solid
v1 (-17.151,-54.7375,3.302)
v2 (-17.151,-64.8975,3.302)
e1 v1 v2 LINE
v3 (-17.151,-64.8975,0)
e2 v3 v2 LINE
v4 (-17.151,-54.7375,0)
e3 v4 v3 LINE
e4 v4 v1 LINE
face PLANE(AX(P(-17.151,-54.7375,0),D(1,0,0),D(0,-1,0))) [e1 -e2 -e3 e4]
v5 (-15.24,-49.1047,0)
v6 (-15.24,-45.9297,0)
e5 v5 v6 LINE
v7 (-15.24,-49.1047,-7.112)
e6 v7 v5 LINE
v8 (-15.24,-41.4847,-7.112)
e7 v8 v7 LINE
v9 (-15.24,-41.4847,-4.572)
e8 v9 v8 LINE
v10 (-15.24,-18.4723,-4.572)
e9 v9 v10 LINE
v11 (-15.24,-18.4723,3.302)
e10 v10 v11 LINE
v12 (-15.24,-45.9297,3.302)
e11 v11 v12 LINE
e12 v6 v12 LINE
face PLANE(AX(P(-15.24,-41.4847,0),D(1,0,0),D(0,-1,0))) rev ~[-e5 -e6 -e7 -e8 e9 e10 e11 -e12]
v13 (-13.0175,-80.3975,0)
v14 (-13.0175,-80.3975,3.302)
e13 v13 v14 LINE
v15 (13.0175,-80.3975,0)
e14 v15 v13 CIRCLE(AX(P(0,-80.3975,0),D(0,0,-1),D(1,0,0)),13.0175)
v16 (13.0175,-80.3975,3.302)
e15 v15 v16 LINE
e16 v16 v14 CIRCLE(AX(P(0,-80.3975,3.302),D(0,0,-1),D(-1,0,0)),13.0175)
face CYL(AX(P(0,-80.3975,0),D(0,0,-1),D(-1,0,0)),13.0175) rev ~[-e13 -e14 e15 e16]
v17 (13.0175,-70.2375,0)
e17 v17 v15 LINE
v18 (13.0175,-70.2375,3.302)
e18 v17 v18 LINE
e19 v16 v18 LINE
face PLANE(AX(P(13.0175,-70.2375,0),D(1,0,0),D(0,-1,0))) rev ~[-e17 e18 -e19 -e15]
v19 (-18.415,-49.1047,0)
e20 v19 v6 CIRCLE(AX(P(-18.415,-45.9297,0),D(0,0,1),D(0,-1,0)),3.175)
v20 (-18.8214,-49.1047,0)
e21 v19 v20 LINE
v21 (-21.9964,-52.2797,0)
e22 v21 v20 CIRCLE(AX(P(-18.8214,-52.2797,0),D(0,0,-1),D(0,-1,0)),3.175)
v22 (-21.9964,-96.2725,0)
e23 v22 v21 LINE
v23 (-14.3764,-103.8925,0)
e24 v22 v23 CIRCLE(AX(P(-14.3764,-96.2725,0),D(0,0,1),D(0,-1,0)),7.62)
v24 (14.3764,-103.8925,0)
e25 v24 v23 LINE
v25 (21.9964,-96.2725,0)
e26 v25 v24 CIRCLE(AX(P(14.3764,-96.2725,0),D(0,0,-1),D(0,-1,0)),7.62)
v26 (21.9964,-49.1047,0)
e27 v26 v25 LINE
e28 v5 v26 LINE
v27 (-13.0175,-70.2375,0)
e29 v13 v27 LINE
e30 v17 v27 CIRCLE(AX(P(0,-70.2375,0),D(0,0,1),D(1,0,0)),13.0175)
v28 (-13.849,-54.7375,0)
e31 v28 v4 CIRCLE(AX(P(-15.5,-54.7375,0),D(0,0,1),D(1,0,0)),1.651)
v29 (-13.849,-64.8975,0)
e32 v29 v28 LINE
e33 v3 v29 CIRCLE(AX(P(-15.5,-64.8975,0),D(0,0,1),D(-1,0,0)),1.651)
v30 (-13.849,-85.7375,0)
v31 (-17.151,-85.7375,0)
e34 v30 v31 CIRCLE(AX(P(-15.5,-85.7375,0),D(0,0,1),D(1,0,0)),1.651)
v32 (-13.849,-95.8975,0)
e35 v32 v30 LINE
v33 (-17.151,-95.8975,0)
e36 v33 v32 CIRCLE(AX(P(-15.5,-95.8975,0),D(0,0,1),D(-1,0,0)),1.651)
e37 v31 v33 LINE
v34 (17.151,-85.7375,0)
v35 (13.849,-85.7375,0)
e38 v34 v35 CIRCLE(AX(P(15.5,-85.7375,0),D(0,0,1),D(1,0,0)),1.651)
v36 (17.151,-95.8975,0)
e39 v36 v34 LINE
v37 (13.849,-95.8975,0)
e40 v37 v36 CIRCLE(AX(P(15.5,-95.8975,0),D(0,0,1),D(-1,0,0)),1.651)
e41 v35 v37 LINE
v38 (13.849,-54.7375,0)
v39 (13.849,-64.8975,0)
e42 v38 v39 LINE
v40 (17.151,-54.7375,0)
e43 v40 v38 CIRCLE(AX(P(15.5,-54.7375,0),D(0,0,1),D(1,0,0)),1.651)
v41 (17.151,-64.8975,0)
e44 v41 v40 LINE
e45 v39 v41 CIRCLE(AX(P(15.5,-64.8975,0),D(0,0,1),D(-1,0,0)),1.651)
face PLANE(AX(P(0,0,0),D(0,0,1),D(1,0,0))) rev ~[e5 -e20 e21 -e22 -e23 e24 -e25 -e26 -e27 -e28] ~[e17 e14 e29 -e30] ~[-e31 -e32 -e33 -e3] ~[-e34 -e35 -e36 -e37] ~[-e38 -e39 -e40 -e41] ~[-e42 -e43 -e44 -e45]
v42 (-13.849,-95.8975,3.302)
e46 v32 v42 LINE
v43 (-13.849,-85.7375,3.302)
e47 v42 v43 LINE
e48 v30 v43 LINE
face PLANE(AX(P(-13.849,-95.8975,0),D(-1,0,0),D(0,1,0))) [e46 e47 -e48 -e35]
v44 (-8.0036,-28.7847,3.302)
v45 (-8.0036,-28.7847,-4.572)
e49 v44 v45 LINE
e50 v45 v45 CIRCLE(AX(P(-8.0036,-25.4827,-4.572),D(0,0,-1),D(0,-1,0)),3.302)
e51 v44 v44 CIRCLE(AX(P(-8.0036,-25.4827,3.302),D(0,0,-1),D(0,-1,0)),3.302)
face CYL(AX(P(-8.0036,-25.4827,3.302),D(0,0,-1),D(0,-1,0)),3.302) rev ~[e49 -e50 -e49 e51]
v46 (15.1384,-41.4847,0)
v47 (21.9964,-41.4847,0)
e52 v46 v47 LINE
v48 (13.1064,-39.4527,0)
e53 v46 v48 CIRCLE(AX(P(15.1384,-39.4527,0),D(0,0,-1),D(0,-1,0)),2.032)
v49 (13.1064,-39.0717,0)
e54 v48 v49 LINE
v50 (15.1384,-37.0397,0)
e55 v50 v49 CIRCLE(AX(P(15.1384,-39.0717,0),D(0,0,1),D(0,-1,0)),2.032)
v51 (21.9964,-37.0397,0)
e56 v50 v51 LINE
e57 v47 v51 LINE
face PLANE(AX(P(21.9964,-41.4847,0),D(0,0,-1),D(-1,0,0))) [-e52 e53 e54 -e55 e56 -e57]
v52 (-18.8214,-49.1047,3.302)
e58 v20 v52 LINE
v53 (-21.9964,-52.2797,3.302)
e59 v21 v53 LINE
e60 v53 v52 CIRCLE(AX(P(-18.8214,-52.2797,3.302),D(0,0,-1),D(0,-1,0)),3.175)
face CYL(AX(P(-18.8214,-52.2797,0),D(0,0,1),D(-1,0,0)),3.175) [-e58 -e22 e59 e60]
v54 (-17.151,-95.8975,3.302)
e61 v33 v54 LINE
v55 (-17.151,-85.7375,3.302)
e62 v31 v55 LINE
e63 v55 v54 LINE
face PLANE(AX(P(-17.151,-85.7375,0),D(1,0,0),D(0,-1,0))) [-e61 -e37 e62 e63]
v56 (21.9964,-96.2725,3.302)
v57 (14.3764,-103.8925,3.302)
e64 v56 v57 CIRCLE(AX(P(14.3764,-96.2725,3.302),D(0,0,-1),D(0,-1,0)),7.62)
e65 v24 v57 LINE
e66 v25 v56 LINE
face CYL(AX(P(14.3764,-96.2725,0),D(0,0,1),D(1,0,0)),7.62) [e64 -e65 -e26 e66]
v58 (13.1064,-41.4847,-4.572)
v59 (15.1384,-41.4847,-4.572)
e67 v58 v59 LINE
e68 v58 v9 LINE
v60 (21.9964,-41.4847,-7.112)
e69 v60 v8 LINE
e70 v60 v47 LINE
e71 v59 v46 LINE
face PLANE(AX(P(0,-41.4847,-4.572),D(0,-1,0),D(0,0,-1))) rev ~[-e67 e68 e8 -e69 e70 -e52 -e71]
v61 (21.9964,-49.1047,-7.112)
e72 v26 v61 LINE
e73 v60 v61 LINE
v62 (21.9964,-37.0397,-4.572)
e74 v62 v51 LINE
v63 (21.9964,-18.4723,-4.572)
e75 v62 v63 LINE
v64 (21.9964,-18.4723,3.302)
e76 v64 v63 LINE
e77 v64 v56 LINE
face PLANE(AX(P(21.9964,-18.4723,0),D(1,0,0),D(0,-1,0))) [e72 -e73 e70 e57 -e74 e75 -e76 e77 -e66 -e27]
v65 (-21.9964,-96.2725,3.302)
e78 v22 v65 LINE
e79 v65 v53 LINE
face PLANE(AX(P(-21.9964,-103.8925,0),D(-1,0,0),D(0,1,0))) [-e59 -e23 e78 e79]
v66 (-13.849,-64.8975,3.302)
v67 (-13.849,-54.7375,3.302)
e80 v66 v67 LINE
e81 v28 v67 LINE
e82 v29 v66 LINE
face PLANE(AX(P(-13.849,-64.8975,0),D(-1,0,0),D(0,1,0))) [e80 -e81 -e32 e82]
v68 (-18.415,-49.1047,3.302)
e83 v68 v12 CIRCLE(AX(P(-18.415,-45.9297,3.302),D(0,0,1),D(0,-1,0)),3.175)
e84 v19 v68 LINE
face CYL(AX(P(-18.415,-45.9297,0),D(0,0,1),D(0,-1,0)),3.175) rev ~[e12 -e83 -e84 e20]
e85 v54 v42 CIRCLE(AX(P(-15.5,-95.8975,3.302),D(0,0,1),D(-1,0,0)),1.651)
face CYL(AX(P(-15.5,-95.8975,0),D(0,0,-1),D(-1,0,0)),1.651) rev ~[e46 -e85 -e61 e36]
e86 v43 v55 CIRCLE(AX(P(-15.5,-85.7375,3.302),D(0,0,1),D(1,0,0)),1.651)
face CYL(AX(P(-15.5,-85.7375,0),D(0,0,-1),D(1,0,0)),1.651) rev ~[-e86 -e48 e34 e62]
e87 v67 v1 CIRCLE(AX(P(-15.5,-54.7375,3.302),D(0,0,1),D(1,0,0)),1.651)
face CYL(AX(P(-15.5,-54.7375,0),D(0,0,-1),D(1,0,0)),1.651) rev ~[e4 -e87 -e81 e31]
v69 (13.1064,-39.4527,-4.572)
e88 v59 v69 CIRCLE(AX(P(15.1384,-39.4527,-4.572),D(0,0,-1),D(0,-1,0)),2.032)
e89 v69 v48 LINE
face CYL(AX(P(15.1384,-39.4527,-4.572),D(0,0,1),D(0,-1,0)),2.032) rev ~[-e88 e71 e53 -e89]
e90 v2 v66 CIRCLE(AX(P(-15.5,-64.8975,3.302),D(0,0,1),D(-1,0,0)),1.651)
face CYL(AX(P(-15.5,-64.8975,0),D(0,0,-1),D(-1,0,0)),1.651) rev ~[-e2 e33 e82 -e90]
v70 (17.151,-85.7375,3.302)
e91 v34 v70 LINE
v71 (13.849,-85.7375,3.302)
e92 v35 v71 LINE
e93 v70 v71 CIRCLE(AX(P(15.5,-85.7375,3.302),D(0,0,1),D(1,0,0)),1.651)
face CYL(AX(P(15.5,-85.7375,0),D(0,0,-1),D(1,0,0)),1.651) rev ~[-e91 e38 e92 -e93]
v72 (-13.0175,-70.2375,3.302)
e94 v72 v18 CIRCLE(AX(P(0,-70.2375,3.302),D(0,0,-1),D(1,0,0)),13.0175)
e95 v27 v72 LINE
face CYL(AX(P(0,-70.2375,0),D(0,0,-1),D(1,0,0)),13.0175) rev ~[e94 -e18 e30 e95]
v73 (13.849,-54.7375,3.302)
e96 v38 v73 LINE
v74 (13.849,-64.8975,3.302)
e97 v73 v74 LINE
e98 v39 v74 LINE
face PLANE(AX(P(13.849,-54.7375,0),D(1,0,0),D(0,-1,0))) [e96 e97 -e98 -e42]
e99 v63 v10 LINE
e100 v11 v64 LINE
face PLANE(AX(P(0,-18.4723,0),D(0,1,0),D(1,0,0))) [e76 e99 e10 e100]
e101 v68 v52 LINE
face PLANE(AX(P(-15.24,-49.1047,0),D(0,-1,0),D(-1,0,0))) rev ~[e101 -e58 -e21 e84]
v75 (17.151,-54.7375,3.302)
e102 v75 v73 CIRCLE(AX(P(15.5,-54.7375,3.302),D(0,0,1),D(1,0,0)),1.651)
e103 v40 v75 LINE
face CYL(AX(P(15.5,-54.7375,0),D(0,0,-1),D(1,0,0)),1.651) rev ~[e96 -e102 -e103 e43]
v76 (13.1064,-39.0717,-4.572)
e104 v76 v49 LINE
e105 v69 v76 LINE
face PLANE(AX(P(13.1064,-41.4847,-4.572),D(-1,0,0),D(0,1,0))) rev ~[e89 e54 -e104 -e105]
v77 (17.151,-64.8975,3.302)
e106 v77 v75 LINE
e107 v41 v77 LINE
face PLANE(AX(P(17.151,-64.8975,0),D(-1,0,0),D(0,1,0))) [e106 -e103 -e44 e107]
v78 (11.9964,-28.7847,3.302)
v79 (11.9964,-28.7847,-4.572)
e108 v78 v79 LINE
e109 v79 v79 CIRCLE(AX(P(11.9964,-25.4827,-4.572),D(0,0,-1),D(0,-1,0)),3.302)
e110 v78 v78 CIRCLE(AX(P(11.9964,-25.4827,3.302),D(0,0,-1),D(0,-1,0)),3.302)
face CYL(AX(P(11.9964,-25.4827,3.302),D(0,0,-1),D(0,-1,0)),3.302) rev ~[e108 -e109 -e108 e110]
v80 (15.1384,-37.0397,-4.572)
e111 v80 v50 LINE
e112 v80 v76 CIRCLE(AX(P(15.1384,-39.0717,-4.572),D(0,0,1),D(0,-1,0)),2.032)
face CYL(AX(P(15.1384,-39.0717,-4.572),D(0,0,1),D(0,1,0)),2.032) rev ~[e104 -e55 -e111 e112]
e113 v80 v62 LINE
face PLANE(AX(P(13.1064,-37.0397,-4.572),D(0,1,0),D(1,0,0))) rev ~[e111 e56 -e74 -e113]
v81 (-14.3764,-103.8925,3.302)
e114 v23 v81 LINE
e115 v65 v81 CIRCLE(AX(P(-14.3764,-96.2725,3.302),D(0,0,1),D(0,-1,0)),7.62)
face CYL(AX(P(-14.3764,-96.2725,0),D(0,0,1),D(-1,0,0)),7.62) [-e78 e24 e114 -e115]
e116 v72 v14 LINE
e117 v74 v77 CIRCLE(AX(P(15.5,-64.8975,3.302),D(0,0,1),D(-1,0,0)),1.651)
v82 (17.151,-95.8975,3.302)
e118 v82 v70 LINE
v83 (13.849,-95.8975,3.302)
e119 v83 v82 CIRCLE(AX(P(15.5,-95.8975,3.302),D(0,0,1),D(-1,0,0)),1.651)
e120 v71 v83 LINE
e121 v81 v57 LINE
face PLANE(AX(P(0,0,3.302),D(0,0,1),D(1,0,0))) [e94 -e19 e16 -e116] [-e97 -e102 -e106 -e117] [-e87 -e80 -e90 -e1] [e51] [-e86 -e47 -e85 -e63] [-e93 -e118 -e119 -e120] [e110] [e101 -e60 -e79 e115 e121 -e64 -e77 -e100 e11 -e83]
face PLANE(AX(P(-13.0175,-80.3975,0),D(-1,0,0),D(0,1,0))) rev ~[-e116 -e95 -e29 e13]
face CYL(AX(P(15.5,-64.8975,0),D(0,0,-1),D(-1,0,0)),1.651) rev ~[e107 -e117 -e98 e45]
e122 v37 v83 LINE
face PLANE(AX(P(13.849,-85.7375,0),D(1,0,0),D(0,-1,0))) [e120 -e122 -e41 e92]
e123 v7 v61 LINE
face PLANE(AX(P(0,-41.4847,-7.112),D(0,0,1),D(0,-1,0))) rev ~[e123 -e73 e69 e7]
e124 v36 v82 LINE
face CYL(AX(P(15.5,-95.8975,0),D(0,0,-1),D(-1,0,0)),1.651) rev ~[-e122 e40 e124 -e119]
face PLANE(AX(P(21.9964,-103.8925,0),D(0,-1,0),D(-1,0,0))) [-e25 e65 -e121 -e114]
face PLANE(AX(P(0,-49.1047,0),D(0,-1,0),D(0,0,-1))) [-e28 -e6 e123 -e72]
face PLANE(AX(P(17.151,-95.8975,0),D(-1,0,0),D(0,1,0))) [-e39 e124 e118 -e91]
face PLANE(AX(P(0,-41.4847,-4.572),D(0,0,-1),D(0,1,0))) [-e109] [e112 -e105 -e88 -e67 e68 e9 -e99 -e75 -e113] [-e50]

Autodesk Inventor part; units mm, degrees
ref_plane "YZ Plane" through (0, 0, 0) normal (1, 0, 0) x (0, 1, 0)
ref_plane "XZ Plane" through (0, 0, 0) normal (0, 1, 0) x (-1, 0, 0)
sketch "Sketch1" plane through (0, 0, 0) normal (0, 0, 1) x (1, 0, 0)
  line L0 (0, 128.9005) -> (0, -151.1555) projected
  line L1 (-57.1993, 0) -> (35.1957, 0) projected
  line L2 (21.9964, -103.8925) -> (-21.9964, -103.8925)
  line L3 (-21.9964, -103.8925) -> (-21.9964, -18.4723)
  line L4 (-21.9964, -18.4723) -> (21.9964, -18.4723)
  line L5 (21.9964, -18.4723) -> (21.9964, -103.8925)
  line L6 (21.9964, -103.8925) -> (-21.9964, -18.4723) construction
  line L7 (-21.9964, -103.8925) -> (21.9964, -18.4723) construction
  line L8 (15.5, -90.8175) -> (-15.5, -90.8175) construction
  line L9 (-15.5, -90.8175) -> (-15.5, -59.8175) construction
  line L10 (-15.5, -59.8175) -> (15.5, -59.8175) construction
  line L11 (15.5, -59.8175) -> (15.5, -90.8175) construction
  line L12 (15.5, -90.8175) -> (-15.5, -59.8175) construction
  line L13 (-15.5, -90.8175) -> (15.5, -59.8175) construction
  line L14 (0, -111.1475) -> (0, -39.4875) construction
  line L15 (-15.5, -64.8975) -> (-15.5, -54.7375) construction
  line L16 (-13.849, -64.8975) -> (-13.849, -54.7375)
  line L17 (-17.151, -54.7375) -> (-17.151, -64.8975)
  arc A0 (-17.151, -64.8975) -> (-13.849, -64.8975) centre (-15.5, -64.8975) ccw
  arc A1 (-13.849, -54.7375) -> (-17.151, -54.7375) centre (-15.5, -54.7375) ccw
  arc A2 (17.151, -54.7375) -> (13.849, -54.7375) centre (15.5, -54.7375) ccw
  line L18 (17.151, -64.8975) -> (17.151, -54.7375)
  line L19 (15.5, -64.8975) -> (15.5, -54.7375) construction
  line L20 (13.849, -54.7375) -> (13.849, -64.8975)
  arc A3 (13.849, -64.8975) -> (17.151, -64.8975) centre (15.5, -64.8975) ccw
  arc A4 (-13.849, -85.7375) -> (-17.151, -85.7375) centre (-15.5, -85.7375) ccw
  line L21 (-13.849, -95.8975) -> (-13.849, -85.7375)
  line L22 (-15.5, -95.8975) -> (-15.5, -85.7375) construction
  line L23 (-17.151, -85.7375) -> (-17.151, -95.8975)
  arc A5 (-17.151, -95.8975) -> (-13.849, -95.8975) centre (-15.5, -95.8975) ccw
  arc A6 (17.151, -85.7375) -> (13.849, -85.7375) centre (15.5, -85.7375) ccw
  line L24 (17.151, -95.8975) -> (17.151, -85.7375)
  line L25 (15.5, -95.8975) -> (15.5, -85.7375) construction
  line L26 (13.849, -85.7375) -> (13.849, -95.8975)
  arc A7 (13.849, -95.8975) -> (17.151, -95.8975) centre (15.5, -95.8975) ccw
  line L27 (0, -70.2375) -> (0, -80.3975) construction
  line L28 (13.0175, -70.2375) -> (13.0175, -80.3975)
  line L29 (-13.0175, -80.3975) -> (-13.0175, -70.2375)
  arc A8 (13.0175, -70.2375) -> (-13.0175, -70.2375) centre (0, -70.2375) ccw
  arc A9 (-13.0175, -80.3975) -> (13.0175, -80.3975) centre (0, -80.3975) ccw
  point P0 (0, -75.3175)
  point P1 (-44, 88.8925)
  point P2 (15.5, -59.8175)
  point P3 (-15.5, -90.8175)
  point P4 (15.5, -90.8175)
  point P5 (0, -75.3175)
  dimension "d5" = 31
  dimension "d6" = 31
  dimension "d10" = 28.575
  dimension "d11" = 3.302
  dimension "d12" = 10.16
  dimension "d15" = 31
  dimension "d18" = 31
  dimension "d45" = 5.08
  dimension "d51" = 43.9928
  dimension "d62" = 5.08
  dimension "d63" = 85.4202
  dimension "d77" = 21.9964
extrude "Extrusion1" add sketch "Sketch1" along normal blind 3.302
extrude "Extrusion3" cut sketch "Sketch1" along normal through all contours A8 L28 A9 L0 | L0 A9 L29 A8
sketch "Sketch3" plane through (0, 0, 3.302) normal (0, 0, 1) x (1, 0, 0)
  point P0 (0, 0)
  point P1 (-44, 68.8925)
  point P2 (44, 88.8925)
  point P3 (44, 68.8925)
  point P4 (-44, 88.8925)
hole "Hole2" at (-44, 68.8925, 3.302) at (44, 88.8925, 3.302) at (44, 68.8925, 3.302) at (-44, 88.8925, 3.302) direction (0, 0, -1) diameter 7.0104 end through all clearance for "Socket Head Cap Screw" size "M6" standard "Ansi Metric M Profile"
sketch "Sketch5" plane through (0, 0, 0) normal (1, 0, 0) x (0, 1, 0)
  line L0 (-18.4723, 0) -> (-103.8925, 0) projected
  line L1 (-18.4723, 0) -> (-18.4723, 3.302) projected
  line L2 (-103.8925, 3.302) -> (-18.4723, 3.302) projected
  line L3 (-103.8925, 0) -> (-103.8925, 3.302) projected
  line L4 (-18.4723, 0) -> (-103.8925, 0) projected
  line L5 (-18.4723, 0) -> (-49.1047, 0)
  line L6 (-49.1047, 0) -> (-49.1047, -4.572)
  line L7 (-49.1047, -4.572) -> (-18.4723, -4.572)
  line L8 (-18.4723, -4.572) -> (-18.4723, 0)
  line L9 (-49.1047, -4.572) -> (-41.4847, -4.572)
  line L10 (-41.4847, -4.572) -> (-41.4847, -7.112)
  line L11 (-41.4847, -7.112) -> (-49.1047, -7.112)
  line L12 (-49.1047, -7.112) -> (-49.1047, -4.572)
  point P0 (0, 0)
  dimension "d70" = 23.0124
  dimension "d71" = 7.62
  dimension "d72" = 4.572
  dimension "d73" = 2.54
extrude "Extrusion4" add sketch "Sketch5" against normal blind 15.24 and the other way blind 21.9964 contours L8 L7 L6 L0 | L7 L10 L11 L12
fillet "Fillet2" radius 7.62 2 edges at (-21.9964, -103.8925, 1.651) (21.9964, -103.8925, 1.651)
sketch "Sketch6" plane through (0, 0, 3.302) normal (0, 0, 1) x (1, 0, 0)
  line L0 (-15.24, -41.4847) -> (21.9964, -41.4847) projected
  line L1 (21.9964, -96.2725) -> (21.9964, -18.4723) projected
  point P0 (0, 0)
  point P1 (11.9964, -25.4827)
  point P2 (-8.0036, -25.4827)
  dimension "d78" = 10
  dimension "d79" = 20
  dimension "d80" = 16.002
hole "Hole4" at (-8.0036, -25.4827, 3.302) at (11.9964, -25.4827, 3.302) direction (0, 0, -1) diameter 6.604 end through all clearance for "Socket Head Cap Screw" size "M6" standard "Ansi Metric M Profile"
sketch "Sketch7" plane through (0, 0, 0) normal (0, 0, -1) x (-1, 0, 0)
  line L0 (15.24, -41.4847) -> (15.24, -49.1047) projected
  line L1 (15.24, -49.1047) -> (-21.9964, -49.1047) projected
  line L2 (21.9964, -18.4723) -> (15.24, -18.4723) projected
  line L3 (21.9964, -96.2725) -> (21.9964, -18.4723) projected
  line L4 (15.24, -49.1047) -> (21.9964, -49.1047)
  line L5 (21.9964, -49.1047) -> (21.9964, -18.4723)
  line L6 (21.9964, -18.4723) -> (15.24, -18.4723)
  line L7 (15.24, -18.4723) -> (15.24, -49.1047)
  point P0 (0, 0)
extrude "Extrusion5" cut sketch "Sketch7" against normal up to next
fillet "Fillet3" radius 3.175 2 edges at (-15.24, -49.1047, 1.651) (-21.9964, -49.1047, 1.651)
sketch "Sketch8" plane through (21.9964, -41.4847, -4.572) normal (0, 0, -1) x (-1, 0, 0)
  circle A0 centre (30, 16.002) radius 3.302 projected
  circle A1 centre (10, 16.002) radius 3.302 projected
  line L0 (37.2364, 0) -> (0, 0) projected
  line L1 (37.2364, 23.0124) -> (37.2364, 0) projected
  line L2 (37.2364, 23.0124) -> (0, 23.0124) projected
  line L3 (0, 0) -> (0, 23.0124) projected
  line L4 (0, 0) -> (8.89, 0)
  line L5 (8.89, 0) -> (8.89, 4.445)
  line L6 (8.89, 4.445) -> (0, 4.445)
  line L7 (0, 4.445) -> (0, 0)
  point P0 (21.9964, 41.4847)
  dimension "d91" = 4.445
  dimension "d92" = 8.89
extrude "Extrusion6" cut sketch "Sketch8" against normal up to surface (4.572 mm away) contours L0 L3 L6 L5
fillet "Fillet4" radius 2.032 2 edges at (13.1064, -41.4847, -2.286) (13.1064, -37.0397, -2.286)
equation "\"d15\" = d6"
equation "\"d18\" = d6"
equation "\"d77\" = 0.5 * d51"
equation "\"d74\" = 0.5 * d51"
properties part number "J008087" material "ALUMINUM, 6061-T651"
